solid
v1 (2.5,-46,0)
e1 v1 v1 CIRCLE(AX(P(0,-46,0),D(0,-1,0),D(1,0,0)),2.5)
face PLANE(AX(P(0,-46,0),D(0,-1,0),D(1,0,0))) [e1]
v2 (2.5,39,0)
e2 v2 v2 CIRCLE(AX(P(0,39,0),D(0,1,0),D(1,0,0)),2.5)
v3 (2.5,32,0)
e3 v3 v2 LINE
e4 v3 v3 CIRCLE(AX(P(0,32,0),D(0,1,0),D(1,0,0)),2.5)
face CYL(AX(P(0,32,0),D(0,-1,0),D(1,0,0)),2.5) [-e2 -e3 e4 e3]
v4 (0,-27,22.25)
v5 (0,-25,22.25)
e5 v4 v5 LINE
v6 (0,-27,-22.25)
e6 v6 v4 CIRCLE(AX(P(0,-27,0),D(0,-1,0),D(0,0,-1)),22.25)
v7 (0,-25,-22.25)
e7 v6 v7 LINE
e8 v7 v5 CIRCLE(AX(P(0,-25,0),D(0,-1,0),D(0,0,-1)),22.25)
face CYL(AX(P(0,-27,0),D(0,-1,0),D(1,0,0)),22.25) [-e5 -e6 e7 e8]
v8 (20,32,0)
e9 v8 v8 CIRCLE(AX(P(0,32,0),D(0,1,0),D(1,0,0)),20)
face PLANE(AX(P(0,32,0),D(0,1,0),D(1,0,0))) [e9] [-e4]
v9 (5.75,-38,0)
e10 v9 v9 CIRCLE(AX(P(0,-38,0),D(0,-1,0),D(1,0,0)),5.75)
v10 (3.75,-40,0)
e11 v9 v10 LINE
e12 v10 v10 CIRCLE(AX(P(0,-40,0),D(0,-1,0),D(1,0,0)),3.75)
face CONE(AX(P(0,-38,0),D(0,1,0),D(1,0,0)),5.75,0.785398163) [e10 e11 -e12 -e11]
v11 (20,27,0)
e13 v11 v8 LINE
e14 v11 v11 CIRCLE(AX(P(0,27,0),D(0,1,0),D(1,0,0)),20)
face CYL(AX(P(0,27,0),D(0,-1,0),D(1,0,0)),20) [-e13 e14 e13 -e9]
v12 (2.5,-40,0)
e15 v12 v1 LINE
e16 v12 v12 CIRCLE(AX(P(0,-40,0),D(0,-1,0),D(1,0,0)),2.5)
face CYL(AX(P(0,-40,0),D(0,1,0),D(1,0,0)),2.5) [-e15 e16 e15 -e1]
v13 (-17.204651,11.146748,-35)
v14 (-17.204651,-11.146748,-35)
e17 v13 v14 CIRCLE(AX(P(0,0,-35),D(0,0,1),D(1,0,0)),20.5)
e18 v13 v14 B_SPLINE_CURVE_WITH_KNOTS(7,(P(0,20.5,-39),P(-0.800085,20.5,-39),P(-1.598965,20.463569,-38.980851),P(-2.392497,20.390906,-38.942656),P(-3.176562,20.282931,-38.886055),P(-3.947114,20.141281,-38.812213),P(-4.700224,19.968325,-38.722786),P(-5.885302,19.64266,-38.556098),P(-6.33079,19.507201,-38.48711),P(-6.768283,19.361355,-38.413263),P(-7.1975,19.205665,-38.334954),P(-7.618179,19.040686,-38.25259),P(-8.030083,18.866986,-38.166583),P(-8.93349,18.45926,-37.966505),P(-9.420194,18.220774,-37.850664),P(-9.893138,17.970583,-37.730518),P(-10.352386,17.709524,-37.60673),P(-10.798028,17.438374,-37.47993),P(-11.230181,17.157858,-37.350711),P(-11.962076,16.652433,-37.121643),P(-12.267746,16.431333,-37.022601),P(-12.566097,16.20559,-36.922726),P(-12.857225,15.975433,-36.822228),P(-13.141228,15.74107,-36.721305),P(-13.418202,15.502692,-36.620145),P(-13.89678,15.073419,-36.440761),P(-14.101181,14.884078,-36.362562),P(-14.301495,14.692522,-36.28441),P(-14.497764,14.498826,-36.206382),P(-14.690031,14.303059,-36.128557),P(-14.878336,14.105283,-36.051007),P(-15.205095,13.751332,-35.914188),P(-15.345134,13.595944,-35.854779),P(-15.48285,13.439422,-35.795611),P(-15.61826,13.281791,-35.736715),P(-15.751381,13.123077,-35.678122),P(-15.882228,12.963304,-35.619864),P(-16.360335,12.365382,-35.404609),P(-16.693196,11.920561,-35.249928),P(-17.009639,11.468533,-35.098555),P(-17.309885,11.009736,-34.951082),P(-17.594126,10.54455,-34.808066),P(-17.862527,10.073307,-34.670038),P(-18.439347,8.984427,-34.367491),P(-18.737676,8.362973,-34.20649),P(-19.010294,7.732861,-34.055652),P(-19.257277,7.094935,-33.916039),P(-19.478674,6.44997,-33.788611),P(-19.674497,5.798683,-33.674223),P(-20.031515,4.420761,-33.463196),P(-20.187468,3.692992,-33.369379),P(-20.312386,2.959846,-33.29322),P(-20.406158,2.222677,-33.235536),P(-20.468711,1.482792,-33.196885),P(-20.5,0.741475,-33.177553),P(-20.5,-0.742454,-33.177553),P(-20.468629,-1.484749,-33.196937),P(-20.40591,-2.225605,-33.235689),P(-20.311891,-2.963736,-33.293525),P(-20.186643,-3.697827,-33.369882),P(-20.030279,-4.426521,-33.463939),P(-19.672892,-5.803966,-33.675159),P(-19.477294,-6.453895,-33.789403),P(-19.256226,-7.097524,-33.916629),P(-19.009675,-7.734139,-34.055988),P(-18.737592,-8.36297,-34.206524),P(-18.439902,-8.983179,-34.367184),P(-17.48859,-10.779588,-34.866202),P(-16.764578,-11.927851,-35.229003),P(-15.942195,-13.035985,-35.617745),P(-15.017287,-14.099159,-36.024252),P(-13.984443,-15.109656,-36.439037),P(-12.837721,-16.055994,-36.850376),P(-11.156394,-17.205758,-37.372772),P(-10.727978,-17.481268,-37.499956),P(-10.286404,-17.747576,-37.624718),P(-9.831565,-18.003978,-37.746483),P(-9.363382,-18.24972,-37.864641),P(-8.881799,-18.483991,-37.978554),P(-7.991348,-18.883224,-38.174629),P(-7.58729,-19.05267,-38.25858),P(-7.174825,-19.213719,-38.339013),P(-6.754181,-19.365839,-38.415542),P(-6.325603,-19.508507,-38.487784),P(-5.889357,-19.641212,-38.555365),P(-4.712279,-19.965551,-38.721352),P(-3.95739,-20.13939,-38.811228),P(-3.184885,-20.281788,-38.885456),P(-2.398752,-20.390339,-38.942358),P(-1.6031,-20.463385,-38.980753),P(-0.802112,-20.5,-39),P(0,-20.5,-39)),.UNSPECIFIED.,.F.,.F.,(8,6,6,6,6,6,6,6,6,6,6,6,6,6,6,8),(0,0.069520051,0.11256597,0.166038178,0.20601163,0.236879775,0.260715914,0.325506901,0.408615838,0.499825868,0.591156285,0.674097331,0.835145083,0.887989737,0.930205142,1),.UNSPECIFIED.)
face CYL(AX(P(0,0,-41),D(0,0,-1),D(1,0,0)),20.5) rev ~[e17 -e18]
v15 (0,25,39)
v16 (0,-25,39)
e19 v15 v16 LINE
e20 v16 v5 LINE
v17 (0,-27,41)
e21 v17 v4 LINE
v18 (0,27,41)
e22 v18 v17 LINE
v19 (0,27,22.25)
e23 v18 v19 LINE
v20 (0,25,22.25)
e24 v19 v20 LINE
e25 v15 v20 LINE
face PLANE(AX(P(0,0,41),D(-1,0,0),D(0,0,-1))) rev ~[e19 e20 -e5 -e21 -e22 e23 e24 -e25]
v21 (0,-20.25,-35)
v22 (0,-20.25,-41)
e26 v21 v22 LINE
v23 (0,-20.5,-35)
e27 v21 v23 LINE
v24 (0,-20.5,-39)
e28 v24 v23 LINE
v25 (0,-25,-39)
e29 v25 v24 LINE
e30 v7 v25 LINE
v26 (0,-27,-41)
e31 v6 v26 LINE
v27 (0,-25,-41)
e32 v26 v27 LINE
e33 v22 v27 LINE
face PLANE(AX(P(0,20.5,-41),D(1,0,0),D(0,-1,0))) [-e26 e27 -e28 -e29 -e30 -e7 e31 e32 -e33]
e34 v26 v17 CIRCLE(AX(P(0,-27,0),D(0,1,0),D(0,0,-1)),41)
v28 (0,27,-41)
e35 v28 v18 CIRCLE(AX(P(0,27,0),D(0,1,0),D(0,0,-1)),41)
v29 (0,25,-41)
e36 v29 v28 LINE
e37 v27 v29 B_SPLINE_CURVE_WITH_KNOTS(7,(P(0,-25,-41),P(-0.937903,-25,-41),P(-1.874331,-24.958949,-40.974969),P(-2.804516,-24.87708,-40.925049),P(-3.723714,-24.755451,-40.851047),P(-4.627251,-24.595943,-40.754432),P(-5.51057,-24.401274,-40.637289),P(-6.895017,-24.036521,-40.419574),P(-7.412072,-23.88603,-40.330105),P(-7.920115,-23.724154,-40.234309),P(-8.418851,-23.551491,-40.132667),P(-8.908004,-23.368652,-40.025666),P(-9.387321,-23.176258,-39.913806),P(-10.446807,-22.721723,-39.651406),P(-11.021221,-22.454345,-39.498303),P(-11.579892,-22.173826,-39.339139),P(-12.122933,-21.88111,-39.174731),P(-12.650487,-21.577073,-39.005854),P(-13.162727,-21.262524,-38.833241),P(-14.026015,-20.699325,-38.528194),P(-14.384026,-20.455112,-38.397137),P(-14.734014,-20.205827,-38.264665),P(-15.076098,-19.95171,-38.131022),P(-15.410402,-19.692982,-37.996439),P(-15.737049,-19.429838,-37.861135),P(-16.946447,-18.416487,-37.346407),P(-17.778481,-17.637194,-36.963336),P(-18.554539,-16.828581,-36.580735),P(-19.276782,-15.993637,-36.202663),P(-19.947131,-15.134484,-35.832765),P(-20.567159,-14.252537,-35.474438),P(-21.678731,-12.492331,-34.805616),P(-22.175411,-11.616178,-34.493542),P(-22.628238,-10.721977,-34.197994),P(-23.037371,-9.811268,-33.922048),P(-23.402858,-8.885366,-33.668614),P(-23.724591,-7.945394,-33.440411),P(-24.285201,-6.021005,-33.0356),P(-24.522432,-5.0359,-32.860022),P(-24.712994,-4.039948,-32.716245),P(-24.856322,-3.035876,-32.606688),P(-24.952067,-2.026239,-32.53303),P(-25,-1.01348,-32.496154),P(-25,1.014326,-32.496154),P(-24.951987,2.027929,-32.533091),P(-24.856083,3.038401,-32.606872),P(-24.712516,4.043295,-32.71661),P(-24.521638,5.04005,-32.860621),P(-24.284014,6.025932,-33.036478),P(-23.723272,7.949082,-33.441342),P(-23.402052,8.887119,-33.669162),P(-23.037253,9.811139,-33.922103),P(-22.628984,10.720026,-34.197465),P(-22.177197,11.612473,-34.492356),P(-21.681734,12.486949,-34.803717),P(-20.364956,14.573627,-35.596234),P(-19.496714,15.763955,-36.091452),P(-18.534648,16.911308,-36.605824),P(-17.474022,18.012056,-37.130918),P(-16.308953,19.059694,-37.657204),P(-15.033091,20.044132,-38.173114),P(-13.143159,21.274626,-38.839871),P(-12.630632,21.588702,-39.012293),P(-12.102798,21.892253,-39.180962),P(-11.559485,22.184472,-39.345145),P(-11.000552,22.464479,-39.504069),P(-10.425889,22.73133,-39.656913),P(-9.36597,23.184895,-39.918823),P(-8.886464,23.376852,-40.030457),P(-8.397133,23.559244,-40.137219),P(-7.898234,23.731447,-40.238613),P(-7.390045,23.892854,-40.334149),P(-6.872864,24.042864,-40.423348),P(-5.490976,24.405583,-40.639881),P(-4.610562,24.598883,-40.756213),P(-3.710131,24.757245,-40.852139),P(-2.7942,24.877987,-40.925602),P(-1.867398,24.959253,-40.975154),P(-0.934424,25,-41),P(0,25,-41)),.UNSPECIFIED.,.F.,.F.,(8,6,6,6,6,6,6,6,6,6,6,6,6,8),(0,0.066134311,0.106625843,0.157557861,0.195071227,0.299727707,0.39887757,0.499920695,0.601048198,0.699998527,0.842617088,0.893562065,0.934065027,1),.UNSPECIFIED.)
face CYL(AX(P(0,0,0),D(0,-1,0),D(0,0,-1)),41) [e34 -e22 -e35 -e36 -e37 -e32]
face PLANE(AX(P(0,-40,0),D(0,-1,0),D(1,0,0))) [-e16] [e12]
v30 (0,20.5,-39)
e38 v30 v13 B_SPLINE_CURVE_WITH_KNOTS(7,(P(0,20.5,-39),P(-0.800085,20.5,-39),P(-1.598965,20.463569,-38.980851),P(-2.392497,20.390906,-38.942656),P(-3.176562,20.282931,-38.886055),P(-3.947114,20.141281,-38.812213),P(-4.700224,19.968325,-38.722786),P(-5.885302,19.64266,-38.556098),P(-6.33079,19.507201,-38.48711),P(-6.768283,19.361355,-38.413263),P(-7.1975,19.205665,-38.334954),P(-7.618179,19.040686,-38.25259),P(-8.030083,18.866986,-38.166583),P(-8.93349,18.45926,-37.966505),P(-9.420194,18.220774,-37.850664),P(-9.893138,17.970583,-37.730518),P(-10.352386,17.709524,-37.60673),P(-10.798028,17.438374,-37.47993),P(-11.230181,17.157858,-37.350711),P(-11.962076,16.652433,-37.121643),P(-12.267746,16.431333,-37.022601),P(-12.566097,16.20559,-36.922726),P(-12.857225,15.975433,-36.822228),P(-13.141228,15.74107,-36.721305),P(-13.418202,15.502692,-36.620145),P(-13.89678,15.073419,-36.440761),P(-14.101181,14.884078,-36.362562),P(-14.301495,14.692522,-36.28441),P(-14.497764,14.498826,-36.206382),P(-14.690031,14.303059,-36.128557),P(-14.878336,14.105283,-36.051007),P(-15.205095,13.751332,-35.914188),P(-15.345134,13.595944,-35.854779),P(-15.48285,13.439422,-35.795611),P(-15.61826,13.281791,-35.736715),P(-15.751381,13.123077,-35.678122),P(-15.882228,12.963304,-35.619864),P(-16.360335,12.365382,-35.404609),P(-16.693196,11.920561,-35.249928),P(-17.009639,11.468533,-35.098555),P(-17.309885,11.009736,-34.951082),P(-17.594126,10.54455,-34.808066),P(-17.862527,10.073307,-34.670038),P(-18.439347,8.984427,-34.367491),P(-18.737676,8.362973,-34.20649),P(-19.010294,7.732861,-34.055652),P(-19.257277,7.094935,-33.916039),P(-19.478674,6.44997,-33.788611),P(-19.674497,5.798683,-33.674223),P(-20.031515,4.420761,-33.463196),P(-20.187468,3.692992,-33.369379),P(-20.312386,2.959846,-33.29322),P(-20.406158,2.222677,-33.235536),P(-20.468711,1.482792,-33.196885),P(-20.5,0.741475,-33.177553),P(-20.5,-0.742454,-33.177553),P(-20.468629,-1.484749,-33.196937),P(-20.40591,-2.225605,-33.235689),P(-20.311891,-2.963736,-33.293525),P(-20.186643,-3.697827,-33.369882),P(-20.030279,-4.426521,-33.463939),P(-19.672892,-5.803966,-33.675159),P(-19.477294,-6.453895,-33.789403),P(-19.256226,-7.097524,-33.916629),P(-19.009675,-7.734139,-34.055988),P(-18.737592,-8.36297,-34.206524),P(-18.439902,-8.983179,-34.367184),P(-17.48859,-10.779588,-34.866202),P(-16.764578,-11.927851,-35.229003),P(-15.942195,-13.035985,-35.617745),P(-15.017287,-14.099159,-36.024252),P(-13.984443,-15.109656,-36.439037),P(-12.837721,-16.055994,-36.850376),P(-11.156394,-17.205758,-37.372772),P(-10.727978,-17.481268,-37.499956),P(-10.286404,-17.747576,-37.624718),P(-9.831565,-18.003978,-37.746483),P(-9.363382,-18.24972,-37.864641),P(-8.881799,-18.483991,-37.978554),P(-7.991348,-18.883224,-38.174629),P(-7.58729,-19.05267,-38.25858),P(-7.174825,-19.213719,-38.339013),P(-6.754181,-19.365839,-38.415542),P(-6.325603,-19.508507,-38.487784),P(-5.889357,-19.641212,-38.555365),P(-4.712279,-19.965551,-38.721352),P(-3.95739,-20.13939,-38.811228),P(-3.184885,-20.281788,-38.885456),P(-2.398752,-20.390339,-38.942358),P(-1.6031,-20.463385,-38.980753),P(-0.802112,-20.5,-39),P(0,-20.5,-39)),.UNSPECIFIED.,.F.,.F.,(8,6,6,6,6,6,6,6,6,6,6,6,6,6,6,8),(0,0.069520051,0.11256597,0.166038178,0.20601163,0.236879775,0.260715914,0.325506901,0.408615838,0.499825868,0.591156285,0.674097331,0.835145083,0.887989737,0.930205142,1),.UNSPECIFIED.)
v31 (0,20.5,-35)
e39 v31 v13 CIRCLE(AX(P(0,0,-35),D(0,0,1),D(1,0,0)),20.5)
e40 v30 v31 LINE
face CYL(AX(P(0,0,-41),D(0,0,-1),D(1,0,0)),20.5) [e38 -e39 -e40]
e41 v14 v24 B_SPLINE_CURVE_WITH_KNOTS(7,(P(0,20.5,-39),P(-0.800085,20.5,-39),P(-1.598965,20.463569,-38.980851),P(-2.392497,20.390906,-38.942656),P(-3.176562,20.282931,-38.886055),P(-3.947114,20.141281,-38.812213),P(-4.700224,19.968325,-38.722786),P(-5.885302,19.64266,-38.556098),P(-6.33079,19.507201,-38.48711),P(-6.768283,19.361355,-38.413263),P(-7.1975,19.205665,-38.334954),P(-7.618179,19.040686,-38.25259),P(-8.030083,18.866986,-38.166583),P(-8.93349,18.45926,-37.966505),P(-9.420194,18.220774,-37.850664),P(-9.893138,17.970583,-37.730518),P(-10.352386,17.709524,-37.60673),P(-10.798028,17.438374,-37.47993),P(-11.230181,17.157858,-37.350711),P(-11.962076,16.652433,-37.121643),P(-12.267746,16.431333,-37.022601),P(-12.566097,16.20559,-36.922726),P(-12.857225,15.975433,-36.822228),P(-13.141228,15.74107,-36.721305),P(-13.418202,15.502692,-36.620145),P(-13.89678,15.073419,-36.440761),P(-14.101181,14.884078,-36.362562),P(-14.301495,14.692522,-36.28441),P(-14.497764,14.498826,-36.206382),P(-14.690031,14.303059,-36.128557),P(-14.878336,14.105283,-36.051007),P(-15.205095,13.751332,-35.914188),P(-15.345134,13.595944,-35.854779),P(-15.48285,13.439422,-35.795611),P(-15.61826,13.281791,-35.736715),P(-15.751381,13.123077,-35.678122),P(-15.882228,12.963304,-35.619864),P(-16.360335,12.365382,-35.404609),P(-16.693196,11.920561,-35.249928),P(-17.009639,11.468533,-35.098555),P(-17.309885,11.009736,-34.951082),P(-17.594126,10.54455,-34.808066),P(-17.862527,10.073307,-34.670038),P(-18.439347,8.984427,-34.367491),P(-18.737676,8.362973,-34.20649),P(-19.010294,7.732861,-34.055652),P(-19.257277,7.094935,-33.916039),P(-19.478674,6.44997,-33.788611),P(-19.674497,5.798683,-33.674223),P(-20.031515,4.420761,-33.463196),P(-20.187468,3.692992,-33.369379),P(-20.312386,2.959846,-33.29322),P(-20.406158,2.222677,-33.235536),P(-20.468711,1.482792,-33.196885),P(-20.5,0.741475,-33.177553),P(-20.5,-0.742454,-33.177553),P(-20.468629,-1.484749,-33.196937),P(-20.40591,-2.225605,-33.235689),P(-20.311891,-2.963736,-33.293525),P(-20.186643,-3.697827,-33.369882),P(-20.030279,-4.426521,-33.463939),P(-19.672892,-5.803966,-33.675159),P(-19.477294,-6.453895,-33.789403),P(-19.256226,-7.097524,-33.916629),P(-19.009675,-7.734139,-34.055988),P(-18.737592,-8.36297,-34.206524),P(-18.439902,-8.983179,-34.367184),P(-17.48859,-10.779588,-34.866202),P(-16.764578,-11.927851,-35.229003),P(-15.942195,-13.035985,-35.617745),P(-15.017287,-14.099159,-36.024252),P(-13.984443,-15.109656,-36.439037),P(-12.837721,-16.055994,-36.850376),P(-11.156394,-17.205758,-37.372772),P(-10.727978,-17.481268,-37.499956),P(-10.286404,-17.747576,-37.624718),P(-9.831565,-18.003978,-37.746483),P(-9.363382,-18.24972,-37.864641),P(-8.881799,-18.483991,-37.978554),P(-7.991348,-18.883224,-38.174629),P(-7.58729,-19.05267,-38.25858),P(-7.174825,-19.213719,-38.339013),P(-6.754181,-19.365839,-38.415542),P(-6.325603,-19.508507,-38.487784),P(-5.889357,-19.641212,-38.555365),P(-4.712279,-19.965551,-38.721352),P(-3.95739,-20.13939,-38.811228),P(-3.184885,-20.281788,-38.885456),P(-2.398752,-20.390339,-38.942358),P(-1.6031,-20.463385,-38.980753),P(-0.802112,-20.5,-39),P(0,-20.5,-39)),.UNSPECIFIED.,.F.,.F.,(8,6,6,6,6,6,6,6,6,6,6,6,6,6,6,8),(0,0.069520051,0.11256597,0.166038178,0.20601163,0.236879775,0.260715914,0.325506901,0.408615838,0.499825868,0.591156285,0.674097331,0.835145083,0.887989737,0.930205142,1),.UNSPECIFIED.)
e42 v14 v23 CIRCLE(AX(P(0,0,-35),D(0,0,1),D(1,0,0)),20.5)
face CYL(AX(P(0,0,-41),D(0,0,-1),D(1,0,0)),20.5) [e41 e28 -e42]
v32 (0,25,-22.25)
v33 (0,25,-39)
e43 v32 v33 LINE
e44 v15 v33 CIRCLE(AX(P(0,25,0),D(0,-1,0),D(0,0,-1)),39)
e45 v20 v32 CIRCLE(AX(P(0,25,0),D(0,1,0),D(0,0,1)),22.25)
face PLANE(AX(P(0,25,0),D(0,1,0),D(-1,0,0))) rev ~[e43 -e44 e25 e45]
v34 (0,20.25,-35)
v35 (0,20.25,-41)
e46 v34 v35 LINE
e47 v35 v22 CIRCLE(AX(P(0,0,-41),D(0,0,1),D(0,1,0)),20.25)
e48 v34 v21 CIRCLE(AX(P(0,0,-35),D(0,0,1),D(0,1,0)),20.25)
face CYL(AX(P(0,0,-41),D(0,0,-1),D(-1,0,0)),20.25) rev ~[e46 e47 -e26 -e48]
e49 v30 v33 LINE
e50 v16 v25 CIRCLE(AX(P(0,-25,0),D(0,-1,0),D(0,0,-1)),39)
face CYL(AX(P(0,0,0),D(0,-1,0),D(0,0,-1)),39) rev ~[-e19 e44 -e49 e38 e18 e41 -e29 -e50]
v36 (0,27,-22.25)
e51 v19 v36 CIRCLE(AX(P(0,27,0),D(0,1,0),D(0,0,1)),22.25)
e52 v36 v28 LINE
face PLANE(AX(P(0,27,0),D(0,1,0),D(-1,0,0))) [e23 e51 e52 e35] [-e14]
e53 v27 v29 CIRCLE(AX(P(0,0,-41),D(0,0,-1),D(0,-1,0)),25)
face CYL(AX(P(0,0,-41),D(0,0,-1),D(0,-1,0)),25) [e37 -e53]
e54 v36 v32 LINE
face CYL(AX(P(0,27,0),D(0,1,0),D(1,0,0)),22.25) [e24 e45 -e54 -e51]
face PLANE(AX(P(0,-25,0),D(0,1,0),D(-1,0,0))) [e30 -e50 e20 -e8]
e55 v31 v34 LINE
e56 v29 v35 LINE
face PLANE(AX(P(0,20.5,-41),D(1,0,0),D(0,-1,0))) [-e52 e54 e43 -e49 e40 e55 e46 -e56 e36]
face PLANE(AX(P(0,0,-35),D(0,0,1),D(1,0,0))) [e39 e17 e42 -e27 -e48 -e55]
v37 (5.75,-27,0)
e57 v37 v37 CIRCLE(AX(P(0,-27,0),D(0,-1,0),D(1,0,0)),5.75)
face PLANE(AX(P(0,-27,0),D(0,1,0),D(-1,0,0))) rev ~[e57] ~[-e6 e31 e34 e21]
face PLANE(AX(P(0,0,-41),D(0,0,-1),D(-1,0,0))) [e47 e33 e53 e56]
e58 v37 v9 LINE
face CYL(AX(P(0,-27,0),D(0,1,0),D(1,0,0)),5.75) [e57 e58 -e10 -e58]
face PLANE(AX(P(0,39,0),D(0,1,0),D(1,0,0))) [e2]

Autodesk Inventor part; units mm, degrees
ref_plane "YZ Plane" through (0, 0, 0) normal (1, 0, 0) x (0, 1, 0)
sketch "스케치1" plane through (0, 0, 0) normal (0, 1, 0) x (-1, 0, 0)
  arc A0 (0, -41) -> (0, 41) centre (0, 0) ccw
  line L0 (0, 41) -> (0, -41)
  dimension "d0" = 82
extrude "돌출1" add sketch "스케치1" along normal mid plane 54
shell "쉘1" thickness 2 removed faces 1 at (0, 9, -13.6667)
sketch "스케치3" plane through (0, 27, 0) normal (0, 1, 0) x (1, 0, 0)
  circle A0 centre (0, 0) radius 22.25
  line L0 (0, 41) -> (0, -41) projected
  line L1 (0, -22.25) -> (0, 22.25)
  dimension "d4" = 44.5
extrude "돌출2" add sketch "스케치3" against normal blind 2 contours A0 L0 picked at (7.4489, 4.8102)
mirror "미러1" about plane through (0, 0, 0) normal (0, 1, 0) of "돌출2"
sketch "스케치4" plane through (0, 27, 0) normal (0, 1, 0) x (1, 0, 0)
  circle A0 centre (0, 0) radius 20
  dimension "d7" = 40
extrude "돌출3" add sketch "스케치4" along normal blind 5
sketch "스케치5" plane through (0, 32, 0) normal (0, 1, 0) x (1, 0, 0)
  circle A0 centre (0, 0) radius 2.5
  dimension "d10" = 5
extrude "돌출4" add sketch "스케치5" along normal blind 7
sketch "스케치6" plane through (0, -27, 0) normal (0, -1, 0) x (1, 0, 0)
  circle A0 centre (0, 0) radius 5.75
  dimension "d13" = 11.5
extrude "돌출5" add sketch "스케치6" along normal blind 13
sketch "스케치7" plane through (0, -40, 0) normal (0, -1, 0) x (1, 0, 0)
  circle A0 centre (0, 0) radius 2.5
  dimension "d16" = 5
extrude "돌출6" add sketch "스케치7" along normal blind 6
chamfer "모따기1" distance 2 angle 45 1 edges at (-5.75, -40, 0)
ref_plane "작업 평면1" through (0, 0, -41) normal (0, 0, 1) x (1, 0, 0)
sketch "스케치8" plane through (0, 0, -41) normal (0, 0, 1) x (1, 0, 0)
  circle A0 centre (0, 0) radius 20.5
  dimension "d23" = 41
extrude "돌출7" cut sketch "스케치8" along normal up to surface
ref_plane "작업 평면2" through (0, 0, -41) normal (0, 0, 1) x (1, 0, 0)
sketch "스케치9" plane through (0, 0, -41) normal (0, 0, 1) x (1, 0, 0)
  circle A0 centre (0, 0) radius 20.5
  line L0 (0, 25) -> (0, 20.5) projected
  line L1 (0, 20.5) -> (0, -20.5)
  dimension "d27" = 41
extrude "돌출8" add sketch "스케치9" along normal blind 6 contours L1 A0 picked at (-6.7835, -0.8237)
sketch "스케치10" plane through (0, 0, -41) normal (0, 0, -1) x (-1, 0, 0)
  circle A0 centre (0, 0) radius 20.25
  dimension "d30" = 40.5
extrude "돌출9" cut sketch "스케치10" against normal blind 10
sketch "스케치11" plane through (0, 0, -41) normal (0, 0, -1) x (-1, 0, 0)
  arc A0 (0, -25) -> (0, 25) centre (0, 0) ccw
  line L0 (0, 25) -> (0, 20.25)
  line L1 (0, -20.25) -> (0, -25)
  arc A1 (0, -20.25) -> (0, 20.25) centre (0, 0) ccw
extrude "돌출10" add sketch "스케치11" against normal up to surface
properties part number "헤드(상)"
